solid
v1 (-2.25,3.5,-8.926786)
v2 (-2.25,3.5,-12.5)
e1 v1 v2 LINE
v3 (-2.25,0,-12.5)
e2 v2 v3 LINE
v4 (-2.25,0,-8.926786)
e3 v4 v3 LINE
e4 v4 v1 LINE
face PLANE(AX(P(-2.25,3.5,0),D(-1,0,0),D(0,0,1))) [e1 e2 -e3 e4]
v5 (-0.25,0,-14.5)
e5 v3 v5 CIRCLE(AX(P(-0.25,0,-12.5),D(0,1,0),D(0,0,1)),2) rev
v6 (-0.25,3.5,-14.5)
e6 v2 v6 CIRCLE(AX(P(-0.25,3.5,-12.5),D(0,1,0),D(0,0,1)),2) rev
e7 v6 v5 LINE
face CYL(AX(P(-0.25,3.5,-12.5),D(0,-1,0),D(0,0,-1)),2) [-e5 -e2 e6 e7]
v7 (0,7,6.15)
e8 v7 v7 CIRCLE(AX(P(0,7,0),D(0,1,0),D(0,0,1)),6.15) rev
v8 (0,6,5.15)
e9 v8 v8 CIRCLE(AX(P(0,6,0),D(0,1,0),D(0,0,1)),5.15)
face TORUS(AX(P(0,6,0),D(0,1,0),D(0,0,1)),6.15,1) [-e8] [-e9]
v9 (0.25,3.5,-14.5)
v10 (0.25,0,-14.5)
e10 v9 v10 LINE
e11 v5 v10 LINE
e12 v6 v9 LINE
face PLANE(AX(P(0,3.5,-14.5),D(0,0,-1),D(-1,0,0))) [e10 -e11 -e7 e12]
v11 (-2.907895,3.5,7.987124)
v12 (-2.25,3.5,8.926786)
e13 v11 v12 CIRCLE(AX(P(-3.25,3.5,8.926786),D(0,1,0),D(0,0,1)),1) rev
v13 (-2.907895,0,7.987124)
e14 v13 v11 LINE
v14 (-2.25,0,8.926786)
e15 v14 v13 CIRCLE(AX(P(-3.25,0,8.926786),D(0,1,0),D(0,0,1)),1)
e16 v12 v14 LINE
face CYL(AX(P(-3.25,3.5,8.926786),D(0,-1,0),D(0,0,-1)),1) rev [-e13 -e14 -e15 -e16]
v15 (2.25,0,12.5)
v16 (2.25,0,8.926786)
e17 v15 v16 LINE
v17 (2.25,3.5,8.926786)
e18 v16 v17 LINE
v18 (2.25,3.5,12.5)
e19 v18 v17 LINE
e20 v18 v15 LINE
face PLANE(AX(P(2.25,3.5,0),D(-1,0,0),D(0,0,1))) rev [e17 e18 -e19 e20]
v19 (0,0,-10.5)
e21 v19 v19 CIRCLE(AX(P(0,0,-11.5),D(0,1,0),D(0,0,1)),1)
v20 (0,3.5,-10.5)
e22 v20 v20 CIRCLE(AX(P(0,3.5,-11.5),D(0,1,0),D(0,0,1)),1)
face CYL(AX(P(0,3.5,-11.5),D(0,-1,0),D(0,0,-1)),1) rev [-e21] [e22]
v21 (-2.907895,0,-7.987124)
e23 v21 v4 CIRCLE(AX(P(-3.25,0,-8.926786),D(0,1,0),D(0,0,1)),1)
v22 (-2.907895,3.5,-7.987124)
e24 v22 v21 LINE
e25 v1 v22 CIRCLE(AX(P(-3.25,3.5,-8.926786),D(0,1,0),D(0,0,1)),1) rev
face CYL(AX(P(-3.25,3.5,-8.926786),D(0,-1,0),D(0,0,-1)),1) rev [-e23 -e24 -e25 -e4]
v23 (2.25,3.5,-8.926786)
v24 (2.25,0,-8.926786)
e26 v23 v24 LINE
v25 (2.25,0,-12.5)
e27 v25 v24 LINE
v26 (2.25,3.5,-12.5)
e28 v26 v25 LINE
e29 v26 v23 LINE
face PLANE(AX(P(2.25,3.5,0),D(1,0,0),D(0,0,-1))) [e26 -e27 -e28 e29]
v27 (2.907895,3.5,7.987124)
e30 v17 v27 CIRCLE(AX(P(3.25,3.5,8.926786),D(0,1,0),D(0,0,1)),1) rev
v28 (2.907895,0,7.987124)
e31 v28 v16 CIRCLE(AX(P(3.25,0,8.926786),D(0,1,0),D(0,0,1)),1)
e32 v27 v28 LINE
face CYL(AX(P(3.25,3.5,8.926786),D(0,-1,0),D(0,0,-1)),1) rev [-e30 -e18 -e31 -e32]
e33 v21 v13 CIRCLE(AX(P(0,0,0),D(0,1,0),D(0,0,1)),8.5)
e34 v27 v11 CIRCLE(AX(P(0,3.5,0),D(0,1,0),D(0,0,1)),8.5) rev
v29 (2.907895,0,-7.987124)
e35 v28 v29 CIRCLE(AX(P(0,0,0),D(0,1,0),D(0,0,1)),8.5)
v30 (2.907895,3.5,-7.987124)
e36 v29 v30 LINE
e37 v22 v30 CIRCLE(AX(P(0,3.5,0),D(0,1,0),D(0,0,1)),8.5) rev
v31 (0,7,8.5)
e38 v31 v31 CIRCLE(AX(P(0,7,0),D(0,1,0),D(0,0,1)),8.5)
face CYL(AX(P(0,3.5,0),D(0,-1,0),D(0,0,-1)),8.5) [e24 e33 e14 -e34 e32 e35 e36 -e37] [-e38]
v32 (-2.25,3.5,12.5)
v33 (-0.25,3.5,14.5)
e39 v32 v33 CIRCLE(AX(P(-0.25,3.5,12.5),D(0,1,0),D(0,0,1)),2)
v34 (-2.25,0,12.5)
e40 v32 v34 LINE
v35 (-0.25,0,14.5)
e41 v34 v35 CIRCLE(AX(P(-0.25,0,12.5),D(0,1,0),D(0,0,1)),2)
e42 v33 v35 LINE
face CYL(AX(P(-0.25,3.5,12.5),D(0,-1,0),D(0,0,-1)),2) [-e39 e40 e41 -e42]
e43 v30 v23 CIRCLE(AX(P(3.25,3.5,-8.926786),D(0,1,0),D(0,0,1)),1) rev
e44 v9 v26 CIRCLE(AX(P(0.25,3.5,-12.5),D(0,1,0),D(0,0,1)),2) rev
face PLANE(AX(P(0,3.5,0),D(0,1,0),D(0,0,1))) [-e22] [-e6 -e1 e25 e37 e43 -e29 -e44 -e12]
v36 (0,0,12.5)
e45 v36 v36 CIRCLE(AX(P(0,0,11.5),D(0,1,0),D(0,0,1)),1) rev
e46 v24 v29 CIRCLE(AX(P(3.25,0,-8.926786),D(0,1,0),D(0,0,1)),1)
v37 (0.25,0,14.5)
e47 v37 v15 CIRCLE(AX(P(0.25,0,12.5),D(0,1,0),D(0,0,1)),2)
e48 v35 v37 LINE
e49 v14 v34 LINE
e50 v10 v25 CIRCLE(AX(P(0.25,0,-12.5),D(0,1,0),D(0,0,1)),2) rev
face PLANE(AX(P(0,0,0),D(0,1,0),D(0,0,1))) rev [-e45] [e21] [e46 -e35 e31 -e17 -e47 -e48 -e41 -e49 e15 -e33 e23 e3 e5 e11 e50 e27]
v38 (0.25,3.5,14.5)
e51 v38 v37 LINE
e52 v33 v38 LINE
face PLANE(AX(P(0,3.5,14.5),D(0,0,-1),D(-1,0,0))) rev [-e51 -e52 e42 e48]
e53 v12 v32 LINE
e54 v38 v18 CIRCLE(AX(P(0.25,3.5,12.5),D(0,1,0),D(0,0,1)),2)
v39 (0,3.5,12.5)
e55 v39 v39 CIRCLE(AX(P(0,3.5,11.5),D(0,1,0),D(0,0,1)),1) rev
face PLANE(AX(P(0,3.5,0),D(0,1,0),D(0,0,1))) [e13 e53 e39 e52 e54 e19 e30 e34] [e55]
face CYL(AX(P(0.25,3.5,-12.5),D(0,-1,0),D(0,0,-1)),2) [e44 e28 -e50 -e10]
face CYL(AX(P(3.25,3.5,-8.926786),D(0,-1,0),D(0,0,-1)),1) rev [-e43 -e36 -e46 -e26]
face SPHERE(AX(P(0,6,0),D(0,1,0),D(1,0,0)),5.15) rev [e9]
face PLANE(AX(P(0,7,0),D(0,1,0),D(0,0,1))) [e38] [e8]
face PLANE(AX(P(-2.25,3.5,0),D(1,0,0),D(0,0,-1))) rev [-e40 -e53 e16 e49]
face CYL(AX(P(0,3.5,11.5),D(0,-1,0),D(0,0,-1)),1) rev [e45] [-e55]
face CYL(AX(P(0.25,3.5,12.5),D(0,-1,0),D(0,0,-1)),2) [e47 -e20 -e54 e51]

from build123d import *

# Parameters (mm, degrees)
CROQUIS1_R              = 1
CROQUIS1_R_2            = 8.5
SALIENTE_EXTRUIR1_DEPTH = 3.5
CROQUIS1_3_R            = 8.5
SALIENTE_EXTRUIR2_DEPTH = 7
REDONDEO1_R             = 1
REDONDEO3_R             = 1


with BuildPart() as part:
    # Croquis1 → Saliente-Extruir1 (new body)
    # profile 1 of 3: a face of its own
    with BuildSketch(Plane(origin=(0, 0, 0), x_dir=(1, 0, 0), z_dir=(0, 1, 0))):
        with BuildLine():
            Line((-2.25, 12.5), (-2.25, 8.196798155))
            ThreePointArc((-2.25, 8.196798155), (0, 8.5), (2.25, 8.196798155))
            Line((2.25, 8.196798155), (2.25, 12.5))
            ThreePointArc((2.25, 12.5), (1.664213562, 13.914213562), (0.25, 14.5))
            Line((0.25, 14.5), (-0.25, 14.5))
            ThreePointArc((-0.25, 14.5), (-1.664213562, 13.914213562), (-2.25, 12.5))
        make_face()
        with Locations(Location((0, 11.5, 0), (0, 0, 270))):
            Circle(CROQUIS1_R, mode=Mode.SUBTRACT)
    # profile 2 of 3: a face of its own
    with BuildSketch(Plane(origin=(0, 0, 0), x_dir=(1, 0, 0), z_dir=(0, 1, 0))):
        Circle(CROQUIS1_R_2)
    # profile 3 of 3: a face of its own
    with BuildSketch(Plane(origin=(0, 0, 0), x_dir=(1, 0, 0), z_dir=(0, 1, 0))):
        with BuildLine():
            ThreePointArc((2.25, -8.196798155), (0, -8.5), (-2.25, -8.196798155))
            Line((-2.25, -8.196798155), (-2.25, -12.5))
            ThreePointArc((-2.25, -12.5), (-1.664213562, -13.914213562), (-0.25, -14.5))
            Line((-0.25, -14.5), (0.25, -14.5))
            ThreePointArc((0.25, -14.5), (1.664213562, -13.914213562), (2.25, -12.5))
            Line((2.25, -12.5), (2.25, -8.196798155))
        make_face()
        with Locations(Location((0, -11.5, 0), (0, 0, 270))):
            Circle(CROQUIS1_R, mode=Mode.SUBTRACT)
    extrude(amount=SALIENTE_EXTRUIR1_DEPTH)

    # Croquis1<3> → Saliente-Extruir2 (add)
    with BuildSketch(Plane(origin=(0, 0, 0), x_dir=(1, 0, 0), z_dir=(0, 1, 0))):
        with Locations(Location((0, 0, 0), (0, 0, 74.650522983))):
            Circle(CROQUIS1_3_R)
    extrude(amount=SALIENTE_EXTRUIR2_DEPTH)

    # Redondeo1
    # the kernel refuses this fillet: 1 mm, written as the material it adds along each edge
    with BuildSketch(Plane(origin=(2.25, 0, -8.196798155), x_dir=(0.9527816834401653, 0, 0.3036561603210522), z_dir=(0, 1, 0)), Plane(origin=(-2.25, 0, 8.196798155), x_dir=(-0.9527816834401646, 0, -0.3036561603210549), z_dir=(0, 1, 0))) as redondeo1_piece_1:
        with BuildLine():
            CenterArc((0.731116518, 0.999174765), REDONDEO1_R, 197.677333553, 69.994809912)
            Line((-0.221665165, 0.695518605), (0, 0))
            ThreePointArc((0, 0), (0.345249467, 0.007014494), (0.690498934, 0))
        make_face()
    extrude(amount=3.5)
    with BuildSketch(Plane(origin=(2.25, 0, 8.196798155), x_dir=(0.9527816834401651, 0, -0.3036561603210529), z_dir=(0, 1, 0)), Plane(origin=(-2.25, 0, -8.196798155), x_dir=(-0.9527816834401648, 0, 0.30365616032105397), z_dir=(0, 1, 0))) as redondeo1_piece_2:
        with BuildLine():
            CenterArc((0.731116518, -0.999174765), REDONDEO1_R, 92.327856536, 69.994809912)
            Line((-0.221665165, -0.695518605), (0, 0))
            ThreePointArc((0, 0), (0.345249467, -0.007014494), (0.690498934, 0))
        make_face()
    extrude(amount=3.5)

    # Croquis2 → Cortar-Revolución1 (revolve, cut)
    with BuildSketch(Plane.XY):
        with BuildLine():
            Line((0, 11.15), (0, 0.85))
            ThreePointArc((0, 0.85), (-5.15, 6), (0, 11.15))
        make_face()
    revolve(axis=Axis((0, 11.15, 0), (0, -1, 0)), mode=Mode.SUBTRACT)

    # Redondeo3
    redondeo3_edges = [part.edges().sort_by_distance(p)[0] for p in [
        (5.05197981, 7, 0),
    ]]
    fillet(redondeo3_edges, radius=REDONDEO3_R)


solid = part.part
